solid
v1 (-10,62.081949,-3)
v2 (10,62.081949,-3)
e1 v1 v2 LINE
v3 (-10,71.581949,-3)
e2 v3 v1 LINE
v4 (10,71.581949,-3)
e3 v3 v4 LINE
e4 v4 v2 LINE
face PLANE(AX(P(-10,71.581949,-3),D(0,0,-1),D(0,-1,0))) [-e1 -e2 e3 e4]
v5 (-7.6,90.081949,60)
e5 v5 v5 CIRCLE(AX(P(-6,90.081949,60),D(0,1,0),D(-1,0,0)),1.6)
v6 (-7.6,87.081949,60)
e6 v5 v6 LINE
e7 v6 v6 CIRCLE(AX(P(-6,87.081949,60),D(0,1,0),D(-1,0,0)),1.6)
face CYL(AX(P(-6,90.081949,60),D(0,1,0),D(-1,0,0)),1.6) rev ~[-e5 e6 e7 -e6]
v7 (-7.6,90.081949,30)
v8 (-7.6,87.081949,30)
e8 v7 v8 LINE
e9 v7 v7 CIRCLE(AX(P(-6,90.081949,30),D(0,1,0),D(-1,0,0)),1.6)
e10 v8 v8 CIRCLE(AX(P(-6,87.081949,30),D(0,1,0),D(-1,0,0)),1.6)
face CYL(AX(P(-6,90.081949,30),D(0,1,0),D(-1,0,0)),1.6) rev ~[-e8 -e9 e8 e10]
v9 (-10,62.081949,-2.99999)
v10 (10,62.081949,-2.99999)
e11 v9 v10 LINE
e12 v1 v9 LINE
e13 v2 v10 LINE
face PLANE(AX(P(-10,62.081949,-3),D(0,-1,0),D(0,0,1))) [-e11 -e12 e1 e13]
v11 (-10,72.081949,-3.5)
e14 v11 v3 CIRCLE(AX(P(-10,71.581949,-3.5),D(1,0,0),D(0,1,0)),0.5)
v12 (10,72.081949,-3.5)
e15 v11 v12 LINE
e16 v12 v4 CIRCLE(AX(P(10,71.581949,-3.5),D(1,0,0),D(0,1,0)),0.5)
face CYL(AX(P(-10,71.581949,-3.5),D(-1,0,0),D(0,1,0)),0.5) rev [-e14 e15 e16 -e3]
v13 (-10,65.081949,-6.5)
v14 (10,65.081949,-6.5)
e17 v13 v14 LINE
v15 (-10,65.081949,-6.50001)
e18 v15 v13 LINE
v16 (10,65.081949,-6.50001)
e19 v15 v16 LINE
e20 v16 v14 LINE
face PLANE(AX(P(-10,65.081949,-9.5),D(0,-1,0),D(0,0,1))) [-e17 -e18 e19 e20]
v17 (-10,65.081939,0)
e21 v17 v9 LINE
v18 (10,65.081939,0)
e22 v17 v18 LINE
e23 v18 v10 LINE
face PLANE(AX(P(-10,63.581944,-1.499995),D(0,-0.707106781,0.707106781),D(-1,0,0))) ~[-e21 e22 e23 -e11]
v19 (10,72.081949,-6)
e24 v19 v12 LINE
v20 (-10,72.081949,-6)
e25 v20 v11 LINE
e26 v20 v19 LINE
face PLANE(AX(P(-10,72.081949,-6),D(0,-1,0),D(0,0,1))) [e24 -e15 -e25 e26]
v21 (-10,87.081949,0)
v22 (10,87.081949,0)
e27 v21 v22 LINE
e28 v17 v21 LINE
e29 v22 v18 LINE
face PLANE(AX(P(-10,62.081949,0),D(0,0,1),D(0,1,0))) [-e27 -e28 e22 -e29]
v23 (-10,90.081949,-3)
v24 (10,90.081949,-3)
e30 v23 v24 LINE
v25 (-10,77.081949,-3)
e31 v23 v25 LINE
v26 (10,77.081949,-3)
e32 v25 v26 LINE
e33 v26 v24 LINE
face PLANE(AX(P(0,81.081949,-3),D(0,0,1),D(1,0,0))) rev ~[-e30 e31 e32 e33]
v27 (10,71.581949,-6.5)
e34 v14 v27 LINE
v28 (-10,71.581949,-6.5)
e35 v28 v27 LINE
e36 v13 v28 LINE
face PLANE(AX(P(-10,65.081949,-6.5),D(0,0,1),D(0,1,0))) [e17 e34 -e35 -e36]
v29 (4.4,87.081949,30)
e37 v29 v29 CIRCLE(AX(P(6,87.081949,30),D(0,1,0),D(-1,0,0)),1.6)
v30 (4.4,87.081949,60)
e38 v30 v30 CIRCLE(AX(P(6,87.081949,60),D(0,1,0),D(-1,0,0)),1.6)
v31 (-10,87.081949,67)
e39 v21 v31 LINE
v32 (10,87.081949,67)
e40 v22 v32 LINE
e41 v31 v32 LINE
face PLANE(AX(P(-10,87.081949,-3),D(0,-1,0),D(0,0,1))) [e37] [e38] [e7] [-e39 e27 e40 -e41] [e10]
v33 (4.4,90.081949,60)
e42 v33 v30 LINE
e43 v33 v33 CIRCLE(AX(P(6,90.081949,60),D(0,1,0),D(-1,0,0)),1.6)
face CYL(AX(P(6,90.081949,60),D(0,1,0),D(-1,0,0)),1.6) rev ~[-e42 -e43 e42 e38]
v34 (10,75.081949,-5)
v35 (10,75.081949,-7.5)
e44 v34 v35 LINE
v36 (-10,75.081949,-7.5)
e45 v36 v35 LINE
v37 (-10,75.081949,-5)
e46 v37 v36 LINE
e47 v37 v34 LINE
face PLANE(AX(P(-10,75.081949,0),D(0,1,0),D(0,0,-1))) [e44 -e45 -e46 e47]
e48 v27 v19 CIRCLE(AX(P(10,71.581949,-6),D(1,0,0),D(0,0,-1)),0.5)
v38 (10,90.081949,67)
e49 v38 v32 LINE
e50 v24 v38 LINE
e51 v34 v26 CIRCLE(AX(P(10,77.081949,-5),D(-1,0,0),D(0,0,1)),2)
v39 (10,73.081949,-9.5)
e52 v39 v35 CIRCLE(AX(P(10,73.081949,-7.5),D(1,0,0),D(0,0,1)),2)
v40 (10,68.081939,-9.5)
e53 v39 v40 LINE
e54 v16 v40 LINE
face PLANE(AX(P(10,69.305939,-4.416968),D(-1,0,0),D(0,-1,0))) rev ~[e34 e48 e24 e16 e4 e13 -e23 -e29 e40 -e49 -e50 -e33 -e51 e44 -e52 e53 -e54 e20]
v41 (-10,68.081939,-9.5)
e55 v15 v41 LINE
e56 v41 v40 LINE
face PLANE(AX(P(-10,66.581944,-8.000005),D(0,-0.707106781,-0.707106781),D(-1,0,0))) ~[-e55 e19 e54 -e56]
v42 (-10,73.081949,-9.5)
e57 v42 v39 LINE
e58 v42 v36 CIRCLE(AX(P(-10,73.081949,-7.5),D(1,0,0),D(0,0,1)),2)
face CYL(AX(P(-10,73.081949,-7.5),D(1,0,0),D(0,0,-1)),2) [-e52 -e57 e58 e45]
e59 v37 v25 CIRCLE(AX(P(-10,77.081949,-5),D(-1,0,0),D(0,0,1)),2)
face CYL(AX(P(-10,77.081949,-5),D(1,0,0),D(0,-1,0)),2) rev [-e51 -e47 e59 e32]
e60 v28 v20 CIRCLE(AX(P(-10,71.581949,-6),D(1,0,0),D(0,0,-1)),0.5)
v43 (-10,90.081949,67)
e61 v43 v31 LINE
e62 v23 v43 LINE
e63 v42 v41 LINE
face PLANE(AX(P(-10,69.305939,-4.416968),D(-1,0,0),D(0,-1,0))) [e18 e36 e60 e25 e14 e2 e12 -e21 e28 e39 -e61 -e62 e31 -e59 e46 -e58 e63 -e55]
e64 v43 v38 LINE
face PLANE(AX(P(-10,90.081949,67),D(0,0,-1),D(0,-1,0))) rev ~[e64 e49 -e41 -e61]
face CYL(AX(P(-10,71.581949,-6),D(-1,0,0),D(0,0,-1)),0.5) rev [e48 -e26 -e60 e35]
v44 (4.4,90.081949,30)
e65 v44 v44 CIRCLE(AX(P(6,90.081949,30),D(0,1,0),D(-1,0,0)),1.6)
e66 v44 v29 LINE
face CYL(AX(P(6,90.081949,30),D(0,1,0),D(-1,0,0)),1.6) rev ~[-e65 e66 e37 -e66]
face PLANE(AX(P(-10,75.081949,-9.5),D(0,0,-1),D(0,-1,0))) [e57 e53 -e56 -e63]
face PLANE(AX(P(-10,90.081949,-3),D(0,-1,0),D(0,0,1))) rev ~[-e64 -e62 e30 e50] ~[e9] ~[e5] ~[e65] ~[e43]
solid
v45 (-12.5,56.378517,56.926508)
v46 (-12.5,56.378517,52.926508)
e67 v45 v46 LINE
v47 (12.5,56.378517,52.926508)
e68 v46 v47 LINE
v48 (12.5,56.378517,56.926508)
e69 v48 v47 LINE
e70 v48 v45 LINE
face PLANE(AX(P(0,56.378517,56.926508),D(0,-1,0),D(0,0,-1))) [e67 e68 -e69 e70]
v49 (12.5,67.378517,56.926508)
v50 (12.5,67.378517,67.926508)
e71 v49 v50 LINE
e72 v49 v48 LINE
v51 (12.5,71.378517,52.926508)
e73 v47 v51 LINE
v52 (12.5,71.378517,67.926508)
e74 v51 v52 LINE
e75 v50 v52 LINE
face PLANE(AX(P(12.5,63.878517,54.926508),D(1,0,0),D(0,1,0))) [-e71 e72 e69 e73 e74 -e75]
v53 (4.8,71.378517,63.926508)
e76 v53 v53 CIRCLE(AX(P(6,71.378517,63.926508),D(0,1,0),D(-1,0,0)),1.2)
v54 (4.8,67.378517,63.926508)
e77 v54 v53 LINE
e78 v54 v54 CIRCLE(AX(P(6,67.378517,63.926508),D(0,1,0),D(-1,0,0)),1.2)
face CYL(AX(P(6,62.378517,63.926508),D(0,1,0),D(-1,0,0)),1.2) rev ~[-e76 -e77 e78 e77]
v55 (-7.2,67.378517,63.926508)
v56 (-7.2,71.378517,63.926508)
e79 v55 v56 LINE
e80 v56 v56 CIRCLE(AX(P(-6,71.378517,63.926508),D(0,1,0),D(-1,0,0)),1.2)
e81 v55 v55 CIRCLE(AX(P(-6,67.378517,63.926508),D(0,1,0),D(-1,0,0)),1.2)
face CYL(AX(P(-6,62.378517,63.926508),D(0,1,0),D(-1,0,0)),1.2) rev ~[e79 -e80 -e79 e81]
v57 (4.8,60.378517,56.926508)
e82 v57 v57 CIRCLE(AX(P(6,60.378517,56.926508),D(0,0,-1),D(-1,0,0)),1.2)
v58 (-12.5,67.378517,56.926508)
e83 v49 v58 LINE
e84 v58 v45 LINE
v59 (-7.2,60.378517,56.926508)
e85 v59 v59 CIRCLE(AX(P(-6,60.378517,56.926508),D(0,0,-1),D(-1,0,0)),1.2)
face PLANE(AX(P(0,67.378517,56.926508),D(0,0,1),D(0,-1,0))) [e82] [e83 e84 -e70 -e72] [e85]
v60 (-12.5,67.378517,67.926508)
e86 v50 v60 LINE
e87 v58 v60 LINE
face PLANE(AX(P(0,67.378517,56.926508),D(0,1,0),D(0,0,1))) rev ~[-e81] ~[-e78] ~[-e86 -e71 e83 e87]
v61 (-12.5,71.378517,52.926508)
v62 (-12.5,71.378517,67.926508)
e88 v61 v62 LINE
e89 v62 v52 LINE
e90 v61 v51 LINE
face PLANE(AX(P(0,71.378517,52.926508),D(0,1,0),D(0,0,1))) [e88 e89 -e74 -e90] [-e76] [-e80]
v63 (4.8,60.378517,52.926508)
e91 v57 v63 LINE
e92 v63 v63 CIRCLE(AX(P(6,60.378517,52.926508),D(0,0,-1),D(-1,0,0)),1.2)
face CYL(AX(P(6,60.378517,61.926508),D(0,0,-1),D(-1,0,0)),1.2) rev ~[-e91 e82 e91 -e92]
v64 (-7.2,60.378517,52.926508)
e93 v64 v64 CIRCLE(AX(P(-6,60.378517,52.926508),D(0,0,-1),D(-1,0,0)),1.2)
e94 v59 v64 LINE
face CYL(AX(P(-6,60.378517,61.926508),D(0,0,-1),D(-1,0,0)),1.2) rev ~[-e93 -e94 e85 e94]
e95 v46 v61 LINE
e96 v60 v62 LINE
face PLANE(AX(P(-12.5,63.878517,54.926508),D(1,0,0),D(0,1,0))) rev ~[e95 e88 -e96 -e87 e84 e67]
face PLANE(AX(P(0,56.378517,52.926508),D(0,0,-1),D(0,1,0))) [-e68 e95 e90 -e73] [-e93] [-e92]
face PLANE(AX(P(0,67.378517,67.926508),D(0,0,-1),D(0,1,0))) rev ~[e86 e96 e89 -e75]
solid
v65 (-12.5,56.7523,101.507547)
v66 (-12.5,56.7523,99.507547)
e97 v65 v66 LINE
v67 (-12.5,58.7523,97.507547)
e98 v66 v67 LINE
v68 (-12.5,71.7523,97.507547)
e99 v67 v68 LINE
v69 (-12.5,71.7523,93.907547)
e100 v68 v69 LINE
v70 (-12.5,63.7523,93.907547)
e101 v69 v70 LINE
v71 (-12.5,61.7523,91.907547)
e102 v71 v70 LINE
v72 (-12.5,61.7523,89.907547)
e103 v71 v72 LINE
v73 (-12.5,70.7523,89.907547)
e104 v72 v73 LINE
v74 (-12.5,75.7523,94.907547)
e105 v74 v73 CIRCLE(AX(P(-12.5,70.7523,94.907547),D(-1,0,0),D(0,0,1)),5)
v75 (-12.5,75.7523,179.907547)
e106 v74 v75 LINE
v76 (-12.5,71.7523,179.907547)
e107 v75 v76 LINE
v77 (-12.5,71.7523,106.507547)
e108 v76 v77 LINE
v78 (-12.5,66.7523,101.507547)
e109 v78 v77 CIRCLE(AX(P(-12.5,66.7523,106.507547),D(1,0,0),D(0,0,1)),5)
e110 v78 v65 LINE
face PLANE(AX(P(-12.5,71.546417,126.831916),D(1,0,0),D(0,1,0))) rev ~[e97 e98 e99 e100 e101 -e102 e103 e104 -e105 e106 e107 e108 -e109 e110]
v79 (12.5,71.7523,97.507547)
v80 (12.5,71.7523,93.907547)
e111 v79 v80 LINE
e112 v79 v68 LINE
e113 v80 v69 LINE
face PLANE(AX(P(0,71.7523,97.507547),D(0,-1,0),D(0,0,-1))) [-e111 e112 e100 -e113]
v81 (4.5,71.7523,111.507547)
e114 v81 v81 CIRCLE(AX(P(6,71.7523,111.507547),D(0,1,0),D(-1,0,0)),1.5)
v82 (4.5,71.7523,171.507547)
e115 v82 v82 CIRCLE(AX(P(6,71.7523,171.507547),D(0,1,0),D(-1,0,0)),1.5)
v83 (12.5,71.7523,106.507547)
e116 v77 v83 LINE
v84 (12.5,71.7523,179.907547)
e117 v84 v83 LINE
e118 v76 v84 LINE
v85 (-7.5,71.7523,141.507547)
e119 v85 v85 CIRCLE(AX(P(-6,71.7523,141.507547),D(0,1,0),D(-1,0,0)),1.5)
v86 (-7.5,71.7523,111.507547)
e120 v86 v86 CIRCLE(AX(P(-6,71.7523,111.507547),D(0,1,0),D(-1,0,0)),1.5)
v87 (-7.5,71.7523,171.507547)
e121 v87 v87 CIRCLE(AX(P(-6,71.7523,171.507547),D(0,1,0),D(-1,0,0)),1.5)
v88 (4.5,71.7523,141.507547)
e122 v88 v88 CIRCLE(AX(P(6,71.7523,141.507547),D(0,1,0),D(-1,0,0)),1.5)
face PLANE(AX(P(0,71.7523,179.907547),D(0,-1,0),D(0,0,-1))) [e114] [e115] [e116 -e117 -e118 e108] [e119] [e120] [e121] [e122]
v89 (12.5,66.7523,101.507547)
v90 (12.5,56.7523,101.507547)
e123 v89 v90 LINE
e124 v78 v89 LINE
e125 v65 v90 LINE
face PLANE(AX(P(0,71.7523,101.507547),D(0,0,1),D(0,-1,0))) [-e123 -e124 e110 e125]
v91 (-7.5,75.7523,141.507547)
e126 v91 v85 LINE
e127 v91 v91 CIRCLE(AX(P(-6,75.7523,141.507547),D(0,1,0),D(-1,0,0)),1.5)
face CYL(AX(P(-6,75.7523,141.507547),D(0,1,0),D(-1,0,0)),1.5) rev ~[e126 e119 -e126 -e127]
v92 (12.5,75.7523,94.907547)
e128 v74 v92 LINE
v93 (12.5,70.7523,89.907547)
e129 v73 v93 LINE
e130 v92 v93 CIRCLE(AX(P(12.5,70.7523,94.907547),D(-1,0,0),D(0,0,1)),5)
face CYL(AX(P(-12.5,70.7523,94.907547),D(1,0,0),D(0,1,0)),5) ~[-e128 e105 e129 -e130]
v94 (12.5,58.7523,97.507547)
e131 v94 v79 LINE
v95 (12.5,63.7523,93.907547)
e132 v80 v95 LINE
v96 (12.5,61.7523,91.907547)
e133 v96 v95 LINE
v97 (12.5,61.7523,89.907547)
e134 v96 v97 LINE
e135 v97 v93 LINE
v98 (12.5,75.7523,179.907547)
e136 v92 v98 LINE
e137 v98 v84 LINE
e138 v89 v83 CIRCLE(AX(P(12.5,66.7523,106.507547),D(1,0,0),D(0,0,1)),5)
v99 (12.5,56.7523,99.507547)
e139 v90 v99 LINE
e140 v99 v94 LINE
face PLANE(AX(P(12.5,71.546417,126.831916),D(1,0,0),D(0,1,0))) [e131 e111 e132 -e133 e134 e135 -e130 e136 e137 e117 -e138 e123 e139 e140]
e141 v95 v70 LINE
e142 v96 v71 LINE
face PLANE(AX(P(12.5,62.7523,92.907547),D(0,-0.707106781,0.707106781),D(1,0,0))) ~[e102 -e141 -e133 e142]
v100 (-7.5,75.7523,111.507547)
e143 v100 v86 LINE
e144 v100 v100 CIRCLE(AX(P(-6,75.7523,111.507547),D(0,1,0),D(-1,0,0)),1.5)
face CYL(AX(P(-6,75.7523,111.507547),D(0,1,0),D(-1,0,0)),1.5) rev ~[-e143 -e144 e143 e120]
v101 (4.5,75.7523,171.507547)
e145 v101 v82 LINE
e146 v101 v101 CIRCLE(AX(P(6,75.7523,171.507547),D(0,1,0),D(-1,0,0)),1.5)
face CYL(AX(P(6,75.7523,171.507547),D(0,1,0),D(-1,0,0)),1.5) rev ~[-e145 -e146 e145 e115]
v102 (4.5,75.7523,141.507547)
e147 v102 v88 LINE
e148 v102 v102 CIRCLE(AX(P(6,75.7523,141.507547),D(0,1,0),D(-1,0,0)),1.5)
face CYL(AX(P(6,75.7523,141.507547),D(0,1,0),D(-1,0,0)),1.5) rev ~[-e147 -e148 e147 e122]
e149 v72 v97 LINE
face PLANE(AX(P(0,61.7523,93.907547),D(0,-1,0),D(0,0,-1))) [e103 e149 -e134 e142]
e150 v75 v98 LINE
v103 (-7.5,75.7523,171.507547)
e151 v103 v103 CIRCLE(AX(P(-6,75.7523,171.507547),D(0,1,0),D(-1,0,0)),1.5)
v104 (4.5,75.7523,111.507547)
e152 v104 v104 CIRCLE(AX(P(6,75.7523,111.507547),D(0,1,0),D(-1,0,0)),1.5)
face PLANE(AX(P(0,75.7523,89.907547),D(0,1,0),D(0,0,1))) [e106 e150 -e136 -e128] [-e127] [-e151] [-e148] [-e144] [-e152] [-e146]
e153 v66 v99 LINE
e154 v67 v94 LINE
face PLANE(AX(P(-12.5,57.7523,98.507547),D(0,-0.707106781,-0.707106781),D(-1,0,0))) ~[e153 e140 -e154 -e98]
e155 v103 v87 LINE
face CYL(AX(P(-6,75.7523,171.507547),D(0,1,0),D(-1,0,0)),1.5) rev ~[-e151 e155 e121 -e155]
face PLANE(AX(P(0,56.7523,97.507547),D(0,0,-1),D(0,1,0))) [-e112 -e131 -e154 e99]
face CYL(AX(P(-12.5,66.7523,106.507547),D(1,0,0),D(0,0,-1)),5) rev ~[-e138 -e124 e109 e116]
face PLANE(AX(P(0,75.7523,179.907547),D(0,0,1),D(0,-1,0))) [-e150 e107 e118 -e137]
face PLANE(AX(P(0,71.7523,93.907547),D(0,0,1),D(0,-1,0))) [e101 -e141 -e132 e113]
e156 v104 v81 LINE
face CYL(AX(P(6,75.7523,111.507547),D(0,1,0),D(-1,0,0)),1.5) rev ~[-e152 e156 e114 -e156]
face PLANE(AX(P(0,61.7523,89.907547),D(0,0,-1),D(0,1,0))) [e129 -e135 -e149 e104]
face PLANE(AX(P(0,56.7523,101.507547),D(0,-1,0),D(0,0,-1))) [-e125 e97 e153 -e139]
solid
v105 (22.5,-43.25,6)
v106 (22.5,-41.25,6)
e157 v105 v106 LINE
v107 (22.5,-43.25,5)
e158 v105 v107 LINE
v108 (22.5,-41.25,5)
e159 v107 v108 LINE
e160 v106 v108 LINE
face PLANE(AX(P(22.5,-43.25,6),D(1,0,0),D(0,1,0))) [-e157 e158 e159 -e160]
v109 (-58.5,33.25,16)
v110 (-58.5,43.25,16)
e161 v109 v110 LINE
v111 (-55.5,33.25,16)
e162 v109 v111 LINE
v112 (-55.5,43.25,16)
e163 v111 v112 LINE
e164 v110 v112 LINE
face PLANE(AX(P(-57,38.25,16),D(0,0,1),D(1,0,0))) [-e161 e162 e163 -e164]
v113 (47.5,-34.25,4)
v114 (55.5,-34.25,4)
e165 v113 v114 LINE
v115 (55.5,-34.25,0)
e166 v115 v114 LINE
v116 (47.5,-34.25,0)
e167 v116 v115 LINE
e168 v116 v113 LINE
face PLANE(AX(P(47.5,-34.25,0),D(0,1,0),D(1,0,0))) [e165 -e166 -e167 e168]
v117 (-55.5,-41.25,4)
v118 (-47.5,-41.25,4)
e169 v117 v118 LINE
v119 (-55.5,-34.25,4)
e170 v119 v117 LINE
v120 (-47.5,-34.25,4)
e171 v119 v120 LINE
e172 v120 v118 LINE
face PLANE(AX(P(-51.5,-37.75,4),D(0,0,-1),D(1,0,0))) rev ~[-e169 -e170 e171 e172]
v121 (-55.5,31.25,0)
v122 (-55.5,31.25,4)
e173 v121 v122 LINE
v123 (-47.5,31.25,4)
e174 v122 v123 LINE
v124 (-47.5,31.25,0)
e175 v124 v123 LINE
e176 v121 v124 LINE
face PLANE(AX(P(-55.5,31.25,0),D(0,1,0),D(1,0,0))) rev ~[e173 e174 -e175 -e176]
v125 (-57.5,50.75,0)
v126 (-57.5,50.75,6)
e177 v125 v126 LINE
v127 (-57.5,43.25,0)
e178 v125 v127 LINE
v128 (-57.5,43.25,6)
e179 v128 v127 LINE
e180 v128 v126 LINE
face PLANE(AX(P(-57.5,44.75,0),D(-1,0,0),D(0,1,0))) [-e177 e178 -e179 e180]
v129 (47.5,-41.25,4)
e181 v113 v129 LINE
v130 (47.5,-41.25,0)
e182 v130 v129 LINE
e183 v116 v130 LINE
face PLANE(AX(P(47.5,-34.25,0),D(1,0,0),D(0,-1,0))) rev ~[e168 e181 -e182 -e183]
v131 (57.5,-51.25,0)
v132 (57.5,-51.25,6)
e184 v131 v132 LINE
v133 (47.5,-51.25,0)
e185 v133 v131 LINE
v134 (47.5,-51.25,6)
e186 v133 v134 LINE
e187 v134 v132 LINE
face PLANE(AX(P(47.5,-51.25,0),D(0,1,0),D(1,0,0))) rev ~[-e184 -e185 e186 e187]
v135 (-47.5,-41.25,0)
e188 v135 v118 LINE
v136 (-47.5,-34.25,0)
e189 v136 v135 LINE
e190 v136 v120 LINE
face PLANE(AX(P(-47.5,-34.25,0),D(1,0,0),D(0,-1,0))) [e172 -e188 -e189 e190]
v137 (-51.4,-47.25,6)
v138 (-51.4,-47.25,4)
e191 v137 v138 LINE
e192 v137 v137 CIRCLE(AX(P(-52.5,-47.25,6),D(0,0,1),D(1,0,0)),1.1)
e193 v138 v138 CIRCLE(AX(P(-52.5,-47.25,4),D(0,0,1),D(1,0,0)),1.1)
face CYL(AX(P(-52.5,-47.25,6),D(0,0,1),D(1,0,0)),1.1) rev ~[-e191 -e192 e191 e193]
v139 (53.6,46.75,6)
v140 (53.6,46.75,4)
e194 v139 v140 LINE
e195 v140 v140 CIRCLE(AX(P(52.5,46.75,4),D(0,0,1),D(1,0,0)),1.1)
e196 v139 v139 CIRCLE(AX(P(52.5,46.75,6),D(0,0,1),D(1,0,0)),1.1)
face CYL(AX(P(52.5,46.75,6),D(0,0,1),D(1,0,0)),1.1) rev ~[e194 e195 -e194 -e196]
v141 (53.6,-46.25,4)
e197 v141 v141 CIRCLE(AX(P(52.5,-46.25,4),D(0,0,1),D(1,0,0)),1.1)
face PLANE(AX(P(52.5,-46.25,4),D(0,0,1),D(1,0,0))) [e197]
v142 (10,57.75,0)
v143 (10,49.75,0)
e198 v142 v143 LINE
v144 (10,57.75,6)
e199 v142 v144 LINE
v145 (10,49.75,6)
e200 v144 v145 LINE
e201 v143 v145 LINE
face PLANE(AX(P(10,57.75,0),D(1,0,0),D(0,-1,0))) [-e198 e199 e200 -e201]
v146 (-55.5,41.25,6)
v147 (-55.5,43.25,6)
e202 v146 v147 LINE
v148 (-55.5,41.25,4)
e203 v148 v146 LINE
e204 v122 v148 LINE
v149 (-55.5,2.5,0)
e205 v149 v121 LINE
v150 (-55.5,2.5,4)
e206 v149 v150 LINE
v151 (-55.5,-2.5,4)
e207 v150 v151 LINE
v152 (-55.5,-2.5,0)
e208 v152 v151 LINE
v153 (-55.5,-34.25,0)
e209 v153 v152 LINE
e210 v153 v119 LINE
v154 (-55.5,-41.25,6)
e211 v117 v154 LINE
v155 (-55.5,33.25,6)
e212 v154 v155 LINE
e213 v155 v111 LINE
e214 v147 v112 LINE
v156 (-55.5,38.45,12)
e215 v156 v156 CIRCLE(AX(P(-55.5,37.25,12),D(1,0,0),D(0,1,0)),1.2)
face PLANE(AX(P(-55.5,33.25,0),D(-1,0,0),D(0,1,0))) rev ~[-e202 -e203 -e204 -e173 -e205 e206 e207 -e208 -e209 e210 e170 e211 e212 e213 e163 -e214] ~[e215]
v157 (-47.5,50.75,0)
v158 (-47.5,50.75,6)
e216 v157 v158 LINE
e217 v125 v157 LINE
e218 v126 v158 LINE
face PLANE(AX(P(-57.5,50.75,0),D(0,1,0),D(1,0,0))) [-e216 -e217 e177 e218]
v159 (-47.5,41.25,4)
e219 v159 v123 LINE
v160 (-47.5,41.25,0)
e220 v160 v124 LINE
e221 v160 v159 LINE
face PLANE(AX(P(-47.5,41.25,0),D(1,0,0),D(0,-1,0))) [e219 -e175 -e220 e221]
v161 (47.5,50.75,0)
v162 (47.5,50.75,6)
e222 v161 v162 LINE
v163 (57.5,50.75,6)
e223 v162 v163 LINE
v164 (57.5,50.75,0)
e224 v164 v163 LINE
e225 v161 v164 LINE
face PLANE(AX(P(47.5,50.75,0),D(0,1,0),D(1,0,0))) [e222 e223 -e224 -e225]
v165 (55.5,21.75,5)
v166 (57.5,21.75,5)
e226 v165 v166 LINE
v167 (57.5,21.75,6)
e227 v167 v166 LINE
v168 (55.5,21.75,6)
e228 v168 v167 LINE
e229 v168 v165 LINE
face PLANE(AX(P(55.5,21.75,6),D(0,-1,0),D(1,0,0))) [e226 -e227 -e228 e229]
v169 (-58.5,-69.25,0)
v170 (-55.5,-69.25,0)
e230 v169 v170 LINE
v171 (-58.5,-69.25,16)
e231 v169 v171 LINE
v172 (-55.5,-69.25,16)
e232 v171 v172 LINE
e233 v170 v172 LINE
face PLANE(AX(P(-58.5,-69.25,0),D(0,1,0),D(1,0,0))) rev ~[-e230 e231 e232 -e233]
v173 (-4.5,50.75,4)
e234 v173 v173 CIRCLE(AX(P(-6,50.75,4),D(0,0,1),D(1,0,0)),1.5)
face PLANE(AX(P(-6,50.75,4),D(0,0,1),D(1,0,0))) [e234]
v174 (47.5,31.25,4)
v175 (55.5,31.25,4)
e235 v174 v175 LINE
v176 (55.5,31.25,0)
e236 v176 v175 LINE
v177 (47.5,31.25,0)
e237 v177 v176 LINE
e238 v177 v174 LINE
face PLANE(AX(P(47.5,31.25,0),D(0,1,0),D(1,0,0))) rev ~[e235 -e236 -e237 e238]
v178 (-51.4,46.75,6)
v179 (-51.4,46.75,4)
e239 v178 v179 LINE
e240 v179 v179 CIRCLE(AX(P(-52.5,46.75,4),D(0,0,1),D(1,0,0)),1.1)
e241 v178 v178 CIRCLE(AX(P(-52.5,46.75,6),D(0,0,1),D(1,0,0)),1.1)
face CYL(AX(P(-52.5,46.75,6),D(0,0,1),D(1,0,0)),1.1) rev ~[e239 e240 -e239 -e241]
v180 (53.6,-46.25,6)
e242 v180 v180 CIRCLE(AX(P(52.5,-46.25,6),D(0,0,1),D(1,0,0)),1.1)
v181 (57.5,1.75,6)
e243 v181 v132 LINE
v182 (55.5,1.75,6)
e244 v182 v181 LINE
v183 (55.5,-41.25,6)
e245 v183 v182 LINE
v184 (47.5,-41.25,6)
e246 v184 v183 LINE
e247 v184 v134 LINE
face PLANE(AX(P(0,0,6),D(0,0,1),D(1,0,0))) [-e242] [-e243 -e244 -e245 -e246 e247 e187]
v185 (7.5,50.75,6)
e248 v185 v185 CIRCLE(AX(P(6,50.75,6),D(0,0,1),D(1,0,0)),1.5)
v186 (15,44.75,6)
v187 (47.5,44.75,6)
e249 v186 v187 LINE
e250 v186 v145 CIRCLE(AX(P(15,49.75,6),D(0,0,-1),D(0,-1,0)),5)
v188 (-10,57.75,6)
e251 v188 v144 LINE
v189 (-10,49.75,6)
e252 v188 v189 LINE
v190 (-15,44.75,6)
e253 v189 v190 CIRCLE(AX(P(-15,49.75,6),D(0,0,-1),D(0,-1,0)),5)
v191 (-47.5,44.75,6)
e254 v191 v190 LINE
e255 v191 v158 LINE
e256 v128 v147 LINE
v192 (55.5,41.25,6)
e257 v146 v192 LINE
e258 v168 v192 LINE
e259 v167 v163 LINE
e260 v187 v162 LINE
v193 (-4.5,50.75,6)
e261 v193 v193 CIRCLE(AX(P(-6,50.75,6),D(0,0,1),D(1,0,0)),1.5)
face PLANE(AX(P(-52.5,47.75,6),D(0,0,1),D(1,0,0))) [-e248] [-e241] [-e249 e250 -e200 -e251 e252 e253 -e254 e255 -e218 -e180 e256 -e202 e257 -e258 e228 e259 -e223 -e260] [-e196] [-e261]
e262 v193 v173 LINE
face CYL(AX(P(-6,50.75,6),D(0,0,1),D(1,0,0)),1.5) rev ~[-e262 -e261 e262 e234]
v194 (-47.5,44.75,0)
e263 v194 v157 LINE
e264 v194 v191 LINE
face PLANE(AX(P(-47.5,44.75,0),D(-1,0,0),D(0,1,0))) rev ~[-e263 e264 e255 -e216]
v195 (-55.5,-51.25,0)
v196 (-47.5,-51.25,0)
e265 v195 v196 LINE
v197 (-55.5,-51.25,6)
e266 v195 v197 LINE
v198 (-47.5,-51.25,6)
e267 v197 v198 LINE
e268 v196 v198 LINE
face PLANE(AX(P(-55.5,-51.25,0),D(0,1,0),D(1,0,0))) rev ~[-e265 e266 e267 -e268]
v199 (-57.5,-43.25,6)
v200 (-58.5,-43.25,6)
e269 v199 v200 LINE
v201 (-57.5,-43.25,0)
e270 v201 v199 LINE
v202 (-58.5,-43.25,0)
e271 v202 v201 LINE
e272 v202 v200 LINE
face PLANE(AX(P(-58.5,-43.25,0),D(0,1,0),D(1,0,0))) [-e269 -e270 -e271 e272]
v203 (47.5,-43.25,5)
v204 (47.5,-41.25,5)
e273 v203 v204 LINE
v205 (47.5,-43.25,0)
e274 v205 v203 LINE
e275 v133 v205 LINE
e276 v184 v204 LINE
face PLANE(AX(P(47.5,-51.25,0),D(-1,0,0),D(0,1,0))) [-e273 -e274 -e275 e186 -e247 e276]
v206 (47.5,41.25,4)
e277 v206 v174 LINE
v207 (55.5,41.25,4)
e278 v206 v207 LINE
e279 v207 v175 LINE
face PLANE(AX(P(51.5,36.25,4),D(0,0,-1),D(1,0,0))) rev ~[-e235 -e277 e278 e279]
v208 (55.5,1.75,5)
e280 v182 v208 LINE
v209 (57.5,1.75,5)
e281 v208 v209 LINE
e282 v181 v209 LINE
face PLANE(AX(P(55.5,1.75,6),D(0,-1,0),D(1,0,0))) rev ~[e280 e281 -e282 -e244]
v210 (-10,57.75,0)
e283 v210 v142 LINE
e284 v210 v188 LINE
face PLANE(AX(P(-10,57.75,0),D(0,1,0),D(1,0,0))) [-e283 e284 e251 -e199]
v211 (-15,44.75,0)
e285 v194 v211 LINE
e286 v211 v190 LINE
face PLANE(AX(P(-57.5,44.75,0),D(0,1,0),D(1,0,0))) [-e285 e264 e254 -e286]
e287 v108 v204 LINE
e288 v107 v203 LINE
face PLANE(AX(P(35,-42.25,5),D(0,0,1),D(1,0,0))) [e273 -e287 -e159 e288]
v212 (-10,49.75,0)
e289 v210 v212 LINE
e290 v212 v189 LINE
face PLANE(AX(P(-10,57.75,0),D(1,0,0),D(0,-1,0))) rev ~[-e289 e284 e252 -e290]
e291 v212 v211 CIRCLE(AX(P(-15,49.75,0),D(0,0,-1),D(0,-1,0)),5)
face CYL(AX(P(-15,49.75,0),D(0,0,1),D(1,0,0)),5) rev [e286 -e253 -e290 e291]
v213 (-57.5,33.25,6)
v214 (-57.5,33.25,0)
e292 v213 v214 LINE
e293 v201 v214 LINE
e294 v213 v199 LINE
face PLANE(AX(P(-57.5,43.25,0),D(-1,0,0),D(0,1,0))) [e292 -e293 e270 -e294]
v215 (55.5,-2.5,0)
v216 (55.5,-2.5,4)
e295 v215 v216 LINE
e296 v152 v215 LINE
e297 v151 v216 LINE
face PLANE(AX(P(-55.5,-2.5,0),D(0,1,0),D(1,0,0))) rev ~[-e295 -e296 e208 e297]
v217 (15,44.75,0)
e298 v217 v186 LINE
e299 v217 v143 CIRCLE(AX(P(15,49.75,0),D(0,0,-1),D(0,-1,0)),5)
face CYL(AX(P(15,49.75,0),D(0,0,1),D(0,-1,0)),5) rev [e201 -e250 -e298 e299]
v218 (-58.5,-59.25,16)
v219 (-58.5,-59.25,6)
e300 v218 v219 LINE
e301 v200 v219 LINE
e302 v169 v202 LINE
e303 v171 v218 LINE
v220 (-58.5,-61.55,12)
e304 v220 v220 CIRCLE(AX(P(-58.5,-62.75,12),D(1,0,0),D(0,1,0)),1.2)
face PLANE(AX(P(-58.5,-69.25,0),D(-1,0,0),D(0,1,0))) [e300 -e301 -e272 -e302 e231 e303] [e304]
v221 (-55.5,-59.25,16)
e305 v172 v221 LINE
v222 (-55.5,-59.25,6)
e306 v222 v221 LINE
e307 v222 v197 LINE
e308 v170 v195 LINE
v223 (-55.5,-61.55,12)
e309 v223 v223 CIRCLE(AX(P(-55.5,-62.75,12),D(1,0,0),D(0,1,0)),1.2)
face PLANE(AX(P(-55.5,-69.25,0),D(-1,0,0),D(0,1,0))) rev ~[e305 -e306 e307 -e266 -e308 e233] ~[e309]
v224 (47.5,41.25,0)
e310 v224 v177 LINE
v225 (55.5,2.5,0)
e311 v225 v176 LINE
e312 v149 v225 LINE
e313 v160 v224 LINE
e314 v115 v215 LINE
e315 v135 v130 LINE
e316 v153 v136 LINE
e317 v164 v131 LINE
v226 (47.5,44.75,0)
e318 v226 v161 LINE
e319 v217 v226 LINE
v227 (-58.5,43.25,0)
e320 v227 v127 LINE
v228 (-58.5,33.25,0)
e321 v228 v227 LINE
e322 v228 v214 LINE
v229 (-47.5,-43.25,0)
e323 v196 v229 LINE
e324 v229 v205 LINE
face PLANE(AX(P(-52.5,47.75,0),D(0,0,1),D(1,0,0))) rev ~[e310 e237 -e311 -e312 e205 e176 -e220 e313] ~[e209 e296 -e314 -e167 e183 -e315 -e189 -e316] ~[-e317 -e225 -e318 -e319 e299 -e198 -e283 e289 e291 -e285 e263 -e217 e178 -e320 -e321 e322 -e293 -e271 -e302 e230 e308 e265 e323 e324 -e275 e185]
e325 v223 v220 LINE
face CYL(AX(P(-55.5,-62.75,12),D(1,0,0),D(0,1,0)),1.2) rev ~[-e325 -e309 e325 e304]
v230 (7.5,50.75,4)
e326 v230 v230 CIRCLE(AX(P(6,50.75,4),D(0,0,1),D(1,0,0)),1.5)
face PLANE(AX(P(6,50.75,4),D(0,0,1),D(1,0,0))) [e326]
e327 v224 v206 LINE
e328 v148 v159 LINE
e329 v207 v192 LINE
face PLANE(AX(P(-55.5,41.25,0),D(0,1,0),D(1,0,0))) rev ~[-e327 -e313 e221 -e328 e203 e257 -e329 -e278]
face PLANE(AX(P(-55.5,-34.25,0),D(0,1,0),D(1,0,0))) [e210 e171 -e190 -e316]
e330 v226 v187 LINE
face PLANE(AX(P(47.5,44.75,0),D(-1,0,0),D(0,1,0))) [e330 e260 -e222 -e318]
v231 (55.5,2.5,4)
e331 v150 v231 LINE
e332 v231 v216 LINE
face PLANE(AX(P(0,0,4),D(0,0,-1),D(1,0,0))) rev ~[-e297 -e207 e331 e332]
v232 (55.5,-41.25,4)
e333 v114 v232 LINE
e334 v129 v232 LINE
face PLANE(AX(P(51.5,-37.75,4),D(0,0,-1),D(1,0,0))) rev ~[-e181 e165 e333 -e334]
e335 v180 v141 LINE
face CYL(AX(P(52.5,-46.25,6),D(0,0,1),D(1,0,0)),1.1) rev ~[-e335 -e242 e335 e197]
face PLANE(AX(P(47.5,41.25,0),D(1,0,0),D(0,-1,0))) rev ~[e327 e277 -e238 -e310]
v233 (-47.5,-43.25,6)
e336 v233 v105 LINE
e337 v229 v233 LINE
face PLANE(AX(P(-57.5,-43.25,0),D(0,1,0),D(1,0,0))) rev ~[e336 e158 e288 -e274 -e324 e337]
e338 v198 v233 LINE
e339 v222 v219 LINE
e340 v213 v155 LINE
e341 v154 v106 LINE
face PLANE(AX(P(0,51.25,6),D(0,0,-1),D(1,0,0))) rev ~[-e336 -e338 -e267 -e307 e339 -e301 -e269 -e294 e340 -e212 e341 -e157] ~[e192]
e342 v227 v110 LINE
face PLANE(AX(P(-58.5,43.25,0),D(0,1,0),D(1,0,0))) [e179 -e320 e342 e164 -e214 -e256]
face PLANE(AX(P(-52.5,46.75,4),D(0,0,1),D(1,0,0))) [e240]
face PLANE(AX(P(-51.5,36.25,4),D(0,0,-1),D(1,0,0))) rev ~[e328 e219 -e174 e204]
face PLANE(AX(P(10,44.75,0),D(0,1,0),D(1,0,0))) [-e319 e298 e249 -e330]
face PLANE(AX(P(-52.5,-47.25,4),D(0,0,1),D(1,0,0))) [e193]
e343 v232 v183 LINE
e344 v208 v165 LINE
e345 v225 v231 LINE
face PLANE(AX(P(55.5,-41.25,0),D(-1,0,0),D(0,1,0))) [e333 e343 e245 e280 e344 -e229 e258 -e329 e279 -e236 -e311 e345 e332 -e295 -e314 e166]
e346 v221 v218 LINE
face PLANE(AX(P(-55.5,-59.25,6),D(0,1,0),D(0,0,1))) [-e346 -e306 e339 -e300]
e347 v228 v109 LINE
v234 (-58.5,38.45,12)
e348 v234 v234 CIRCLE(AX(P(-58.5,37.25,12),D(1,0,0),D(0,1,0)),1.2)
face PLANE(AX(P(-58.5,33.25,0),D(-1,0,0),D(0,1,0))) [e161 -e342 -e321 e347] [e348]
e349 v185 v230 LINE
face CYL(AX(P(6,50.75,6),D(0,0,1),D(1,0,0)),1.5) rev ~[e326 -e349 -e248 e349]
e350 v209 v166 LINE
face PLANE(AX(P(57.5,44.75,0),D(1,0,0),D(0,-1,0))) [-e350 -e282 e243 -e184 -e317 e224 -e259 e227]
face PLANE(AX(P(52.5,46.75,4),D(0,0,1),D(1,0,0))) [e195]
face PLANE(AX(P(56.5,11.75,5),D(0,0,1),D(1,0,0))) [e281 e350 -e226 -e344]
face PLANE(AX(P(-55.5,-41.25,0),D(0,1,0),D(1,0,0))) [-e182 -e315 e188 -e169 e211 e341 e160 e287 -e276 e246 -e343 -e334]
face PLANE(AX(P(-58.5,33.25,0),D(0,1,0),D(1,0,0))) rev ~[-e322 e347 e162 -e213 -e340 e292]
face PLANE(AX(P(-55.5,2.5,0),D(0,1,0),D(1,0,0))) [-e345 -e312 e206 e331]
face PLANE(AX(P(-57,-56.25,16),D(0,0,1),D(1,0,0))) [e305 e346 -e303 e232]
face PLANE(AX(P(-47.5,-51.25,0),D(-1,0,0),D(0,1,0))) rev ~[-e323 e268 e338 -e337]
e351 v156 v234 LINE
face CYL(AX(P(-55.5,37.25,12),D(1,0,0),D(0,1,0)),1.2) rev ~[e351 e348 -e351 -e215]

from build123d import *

# Parameters (mm, degrees)
F0_W             = 115
F0_H             = 86.5
F0_W_2           = 111
F0_H_2           = 82.5
F1_DEPTH         = 6
F2_W             = 8
F2_H             = 10
F2_H_2           = 7
F2_W_2           = 111
F2_H_3           = 5
F3_DEPTH         = 4
F4_W             = 25
F4_H             = 2
F4_W_2           = 2
F4_H_2           = 20
F5_DEPTH         = 1
F6_W             = 20
F6_H             = 13
F7_DEPTH         = 6
F8_W             = 20
F8_H             = 12
F9_DEPTH         = 3
F10_W            = 3
F10_H            = 70
F11_DEPTH        = 20
F12_W            = 3
F12_H            = 10
F12_H_2          = 26
F13_DEPTH        = 16
F14_SIZE         = 2.99999
F15_W            = 16
F15_H            = 10
F15_R            = 1.2
F16_DEPTH        = 25
F17_R            = 2
F18_W            = 4
F18_H            = 11
F19_DEPTH        = 12.5
F22_D            = 2.4
F22_DEPTH        = 5
F22_TIP          = 0.7210327428
F22_ON_F21_D     = 2.4
F22_ON_F21_DEPTH = 5
F22_ON_F21_TIP   = 0.7210327428
F23_R            = 1.6
F24_DEPTH        = 25
F26_DEPTH        = 12.5
F27_R            = 5
F27_2_R          = 5
F28_SIZE         = 2
F29_R            = 1.5
F30_DEPTH        = 25
F31_W            = 10
F31_H            = 6
F31_H_2          = 8
F31_W_2          = 8
F32_DEPTH        = 6
F33_R            = 1.1
F33_R_2          = 1.5
F34_DEPTH        = 2


# Not quite as in the source:
# - a fillet or chamfer is up to 0.001 mm smaller than in the source, because OpenCascade refuses the exact size


with BuildPart() as f1:
    # F0 (on Top) → F1 (new body)
    with BuildSketch(Plane.XY):
        Rectangle(F0_W, F0_H)
        Rectangle(F0_W_2, F0_H_2, mode=Mode.SUBTRACT)
    extrude(amount=F1_DEPTH)

    # F2 (on face) → F3 (join)
    with BuildSketch(Plane(origin=(0, 0, 0), x_dir=(1, 0, 0), z_dir=(0, 0, -1))):
        with Locations((-51.5, -36.25)):
            Rectangle(F2_W, F2_H)
        with Locations((51.5, -36.25)):
            Rectangle(F2_W, F2_H)
        with Locations((-51.5, 37.75)):
            Rectangle(F2_W, F2_H_2)
        with Locations((51.5, 37.75)):
            Rectangle(F2_W, F2_H_2)
        Rectangle(F2_W_2, F2_H_3)
    extrude(amount=-F3_DEPTH)

    # F4 (on face) → F5 (cut)
    with BuildSketch(Plane.XY.offset(6)):
        with Locations((35, -42.25)):
            Rectangle(F4_W, F4_H)
        with Locations((56.5, 11.75)):
            Rectangle(F4_W_2, F4_H_2)
    extrude(amount=-F5_DEPTH, mode=Mode.SUBTRACT)

    # F6 (on face) → F7 (join)
    with BuildSketch(Plane(origin=(0, 0, 0), x_dir=(1, 0, 0), z_dir=(0, 0, -1))):
        with Locations((0, -51.25)):
            Rectangle(F6_W, F6_H)
        Polygon((-10, -44.75), (10, -44.75), (57.5, -44.75), (57.5, -43.25), (-57.5, -43.25), (-57.5, -44.75), align=None)
    extrude(amount=-F7_DEPTH)

    # F12 (on Top) → F13 (join)
    with BuildSketch(Plane.XY):
        with Locations((-57, 38.25)):
            Rectangle(F12_W, F12_H)
        with Locations((-57, -56.25)):
            Rectangle(F12_W, F12_H_2)
    extrude(amount=F13_DEPTH)

    # F15 (on face) → F16 (cut)
    with BuildSketch(Plane.YZ.offset(-55.5)):
        with Locations((-51.25, 11)):
            Rectangle(F15_W, F15_H)
        with Locations((-62.75, 12)):
            Circle(F15_R)
        with Locations((37.25, 12)):
            Circle(F15_R)
    extrude(amount=-F16_DEPTH, mode=Mode.SUBTRACT)

    # F27
    f27_edges = [f1.edges().sort_by_distance(p)[0] for p in [
        (-10, 44.75, 3),
        (10, 44.75, 3),
    ]]
    fillet(f27_edges, radius=F27_R)

    # F31 (on Top) → F32 (join)
    with BuildSketch(Plane.XY):
        with Locations((-52.5, 47.75)):
            Rectangle(F31_W, F31_H)
        with Locations((52.5, 47.75)):
            Rectangle(F31_W, F31_H)
        with Locations((52.5, -47.25)):
            Rectangle(F31_W, F31_H_2)
        with Locations((-51.5, -47.25)):
            Rectangle(F31_W_2, F31_H_2)
    extrude(amount=F32_DEPTH)

    # F33 (on face) → F34 (cut)
    with BuildSketch(Plane.XY.offset(6)):
        with Locations((-52.5, 46.75)):
            Circle(F33_R)
        with Locations((52.5, 46.75)):
            Circle(F33_R)
        with Locations((-52.5, -47.25)):
            Circle(F33_R)
        with Locations((52.5, -46.25)):
            Circle(F33_R)
        with Locations((-6, 50.75)):
            Circle(F33_R_2)
        with Locations((6, 50.75)):
            Circle(F33_R_2)
    extrude(amount=-F34_DEPTH, mode=Mode.SUBTRACT)


with BuildPart() as f9:
    # F8 (on Top) → F9 (new body)
    with BuildSketch(Plane.XY):
        with Locations((0, 81.0819491744)):
            Rectangle(F8_W, F8_H)
    extrude(amount=-F9_DEPTH)

    # F10 (on face) → F11 (join)
    with BuildSketch(Plane(origin=(-10, 0, 0), x_dir=(0, -1, 0), z_dir=(-1, 0, 0))):
        with BuildLine():
            Line((-75.0819491744, 0), (-75.0819491744, -3))
            Line((-75.0819491744, -3), (-75.0819491744, -9.5))
            Line((-75.0819491744, -9.5), (-65.0819491744, -9.5))
            Line((-65.0819491744, -9.5), (-65.0819491744, -6.5))
            Line((-65.0819491744, -6.5), (-71.5819491744, -6.5))
            ThreePointArc((-71.5819491744, -6.5), (-71.935502565, -6.3535533906), (-72.0819491744, -6))
            Line((-72.0819491744, -6), (-72.0819491744, -3.5))
            ThreePointArc((-72.0819491744, -3.5), (-71.935502565, -3.1464466094), (-71.5819491744, -3))
            Line((-71.5819491744, -3), (-62.0819491744, -3))
            Line((-62.0819491744, -3), (-62.0819491744, 0))
            Line((-62.0819491744, 0), (-75.0819491744, 0))
        make_face()
        with Locations((-88.5819491744, 32)):
            Rectangle(F10_W, F10_H)
    extrude(amount=-F11_DEPTH)

    # F14 (size 3 in the source; OpenCascade refuses exactly that, so slightly less here)
    f14_edges = [f9.edges().sort_by_distance(p)[0] for p in [
        (0, 62.081949, 0),
        (0, 65.081949, -9.5),
    ]]
    chamfer(f14_edges, length=F14_SIZE)

    # F17
    f17_edges = [f9.edges().sort_by_distance(p)[0] for p in [
        (0, 75.081949, -3),
        (0, 75.081949, -9.5),
    ]]
    fillet(f17_edges, radius=F17_R)

    # F23 (on face) → F24 (cut)
    with BuildSketch(Plane(origin=(0, 90.0819491744, 0), x_dir=(-1, 0, 0), z_dir=(0, 1, 0))):
        with Locations((-6, 30)):
            Circle(F23_R)
        with Locations((6, 30)):
            Circle(F23_R)
        with Locations((-6, 60)):
            Circle(F23_R)
        with Locations((6, 60)):
            Circle(F23_R)
    extrude(amount=-F24_DEPTH, mode=Mode.SUBTRACT)


with BuildPart() as f19:
    # F18 (on Right) → F19 (new body, symmetric)
    with BuildSketch(Plane.YZ):
        Polygon((67.3785170999, 56.9265080243), (56.3785170999, 56.9265080243), (56.3785170999, 52.9265080243), (71.3785170999, 52.9265080243), (71.3785170999, 56.9265080243), align=None)
        with Locations((69.3785170999, 62.4265080243)):
            Rectangle(F18_W, F18_H)
    extrude(amount=F19_DEPTH, both=True)

    # F22
    with Locations(Plane.XY.offset(56.9265080243)):
        with Locations((-6, 60.3785170999), (6, 60.3785170999)):
            Hole(F22_D / 2, depth=F22_DEPTH)
            with Locations((0, 0, -(F22_DEPTH + F22_TIP / 2))):  # 118° drill point
                Cone(0, F22_D / 2, F22_TIP, mode=Mode.SUBTRACT)

    # F22 on F21
    with Locations(Plane.XZ.offset(-67.3785170999)):
        with Locations((-6, 63.9265080243), (6, 63.9265080243)):
            Hole(F22_ON_F21_D / 2, depth=F22_ON_F21_DEPTH)
            with Locations((0, 0, -(F22_ON_F21_DEPTH + F22_ON_F21_TIP / 2))):  # 118° drill point
                Cone(0, F22_ON_F21_D / 2, F22_ON_F21_TIP, mode=Mode.SUBTRACT)


with BuildPart() as f26:
    # F25 (on Right) → F26 (new body, symmetric)
    with BuildSketch(Plane.YZ):
        Polygon((61.7522996068, 93.9075465441), (61.7522996068, 89.9075465441), (75.7522996068, 89.9075465441), (75.7522996068, 179.9075465441), (71.7522996068, 179.9075465441), (71.7522996068, 101.5075465441), (56.7522996068, 101.5075465441), (56.7522996068, 97.5075465441), (71.7522996068, 97.5075465441), (71.7522996068, 93.9075465441), align=None)
    extrude(amount=F26_DEPTH, both=True)

    # F27#2
    f27_2_edges = [f26.edges().sort_by_distance(p)[0] for p in [
        (0, 71.7523, 101.507547),
        (0, 75.7523, 89.907547),
    ]]
    fillet(f27_2_edges, radius=F27_2_R)

    # F28
    f28_edges = [f26.edges().sort_by_distance(p)[0] for p in [
        (0, 56.7523, 97.507547),
        (0, 61.7523, 93.907547),
    ]]
    chamfer(f28_edges, length=F28_SIZE)

    # F29 (on face) → F30 (cut)
    with BuildSketch(Plane(origin=(0, 75.7522996068, 0), x_dir=(-1, 0, 0), z_dir=(0, 1, 0))):
        with Locations((6, 111.5075465441)):
            Circle(F29_R)
        with Locations((-6, 111.5075465441)):
            Circle(F29_R)
        with Locations((6, 141.5075465441)):
            Circle(F29_R)
        with Locations((-6, 141.5075465441)):
            Circle(F29_R)
        with Locations((6, 171.5075465441)):
            Circle(F29_R)
        with Locations((-6, 171.5075465441)):
            Circle(F29_R)
    extrude(amount=-F30_DEPTH, mode=Mode.SUBTRACT)


solid = Compound([f1.part, f9.part, f19.part, f26.part])
